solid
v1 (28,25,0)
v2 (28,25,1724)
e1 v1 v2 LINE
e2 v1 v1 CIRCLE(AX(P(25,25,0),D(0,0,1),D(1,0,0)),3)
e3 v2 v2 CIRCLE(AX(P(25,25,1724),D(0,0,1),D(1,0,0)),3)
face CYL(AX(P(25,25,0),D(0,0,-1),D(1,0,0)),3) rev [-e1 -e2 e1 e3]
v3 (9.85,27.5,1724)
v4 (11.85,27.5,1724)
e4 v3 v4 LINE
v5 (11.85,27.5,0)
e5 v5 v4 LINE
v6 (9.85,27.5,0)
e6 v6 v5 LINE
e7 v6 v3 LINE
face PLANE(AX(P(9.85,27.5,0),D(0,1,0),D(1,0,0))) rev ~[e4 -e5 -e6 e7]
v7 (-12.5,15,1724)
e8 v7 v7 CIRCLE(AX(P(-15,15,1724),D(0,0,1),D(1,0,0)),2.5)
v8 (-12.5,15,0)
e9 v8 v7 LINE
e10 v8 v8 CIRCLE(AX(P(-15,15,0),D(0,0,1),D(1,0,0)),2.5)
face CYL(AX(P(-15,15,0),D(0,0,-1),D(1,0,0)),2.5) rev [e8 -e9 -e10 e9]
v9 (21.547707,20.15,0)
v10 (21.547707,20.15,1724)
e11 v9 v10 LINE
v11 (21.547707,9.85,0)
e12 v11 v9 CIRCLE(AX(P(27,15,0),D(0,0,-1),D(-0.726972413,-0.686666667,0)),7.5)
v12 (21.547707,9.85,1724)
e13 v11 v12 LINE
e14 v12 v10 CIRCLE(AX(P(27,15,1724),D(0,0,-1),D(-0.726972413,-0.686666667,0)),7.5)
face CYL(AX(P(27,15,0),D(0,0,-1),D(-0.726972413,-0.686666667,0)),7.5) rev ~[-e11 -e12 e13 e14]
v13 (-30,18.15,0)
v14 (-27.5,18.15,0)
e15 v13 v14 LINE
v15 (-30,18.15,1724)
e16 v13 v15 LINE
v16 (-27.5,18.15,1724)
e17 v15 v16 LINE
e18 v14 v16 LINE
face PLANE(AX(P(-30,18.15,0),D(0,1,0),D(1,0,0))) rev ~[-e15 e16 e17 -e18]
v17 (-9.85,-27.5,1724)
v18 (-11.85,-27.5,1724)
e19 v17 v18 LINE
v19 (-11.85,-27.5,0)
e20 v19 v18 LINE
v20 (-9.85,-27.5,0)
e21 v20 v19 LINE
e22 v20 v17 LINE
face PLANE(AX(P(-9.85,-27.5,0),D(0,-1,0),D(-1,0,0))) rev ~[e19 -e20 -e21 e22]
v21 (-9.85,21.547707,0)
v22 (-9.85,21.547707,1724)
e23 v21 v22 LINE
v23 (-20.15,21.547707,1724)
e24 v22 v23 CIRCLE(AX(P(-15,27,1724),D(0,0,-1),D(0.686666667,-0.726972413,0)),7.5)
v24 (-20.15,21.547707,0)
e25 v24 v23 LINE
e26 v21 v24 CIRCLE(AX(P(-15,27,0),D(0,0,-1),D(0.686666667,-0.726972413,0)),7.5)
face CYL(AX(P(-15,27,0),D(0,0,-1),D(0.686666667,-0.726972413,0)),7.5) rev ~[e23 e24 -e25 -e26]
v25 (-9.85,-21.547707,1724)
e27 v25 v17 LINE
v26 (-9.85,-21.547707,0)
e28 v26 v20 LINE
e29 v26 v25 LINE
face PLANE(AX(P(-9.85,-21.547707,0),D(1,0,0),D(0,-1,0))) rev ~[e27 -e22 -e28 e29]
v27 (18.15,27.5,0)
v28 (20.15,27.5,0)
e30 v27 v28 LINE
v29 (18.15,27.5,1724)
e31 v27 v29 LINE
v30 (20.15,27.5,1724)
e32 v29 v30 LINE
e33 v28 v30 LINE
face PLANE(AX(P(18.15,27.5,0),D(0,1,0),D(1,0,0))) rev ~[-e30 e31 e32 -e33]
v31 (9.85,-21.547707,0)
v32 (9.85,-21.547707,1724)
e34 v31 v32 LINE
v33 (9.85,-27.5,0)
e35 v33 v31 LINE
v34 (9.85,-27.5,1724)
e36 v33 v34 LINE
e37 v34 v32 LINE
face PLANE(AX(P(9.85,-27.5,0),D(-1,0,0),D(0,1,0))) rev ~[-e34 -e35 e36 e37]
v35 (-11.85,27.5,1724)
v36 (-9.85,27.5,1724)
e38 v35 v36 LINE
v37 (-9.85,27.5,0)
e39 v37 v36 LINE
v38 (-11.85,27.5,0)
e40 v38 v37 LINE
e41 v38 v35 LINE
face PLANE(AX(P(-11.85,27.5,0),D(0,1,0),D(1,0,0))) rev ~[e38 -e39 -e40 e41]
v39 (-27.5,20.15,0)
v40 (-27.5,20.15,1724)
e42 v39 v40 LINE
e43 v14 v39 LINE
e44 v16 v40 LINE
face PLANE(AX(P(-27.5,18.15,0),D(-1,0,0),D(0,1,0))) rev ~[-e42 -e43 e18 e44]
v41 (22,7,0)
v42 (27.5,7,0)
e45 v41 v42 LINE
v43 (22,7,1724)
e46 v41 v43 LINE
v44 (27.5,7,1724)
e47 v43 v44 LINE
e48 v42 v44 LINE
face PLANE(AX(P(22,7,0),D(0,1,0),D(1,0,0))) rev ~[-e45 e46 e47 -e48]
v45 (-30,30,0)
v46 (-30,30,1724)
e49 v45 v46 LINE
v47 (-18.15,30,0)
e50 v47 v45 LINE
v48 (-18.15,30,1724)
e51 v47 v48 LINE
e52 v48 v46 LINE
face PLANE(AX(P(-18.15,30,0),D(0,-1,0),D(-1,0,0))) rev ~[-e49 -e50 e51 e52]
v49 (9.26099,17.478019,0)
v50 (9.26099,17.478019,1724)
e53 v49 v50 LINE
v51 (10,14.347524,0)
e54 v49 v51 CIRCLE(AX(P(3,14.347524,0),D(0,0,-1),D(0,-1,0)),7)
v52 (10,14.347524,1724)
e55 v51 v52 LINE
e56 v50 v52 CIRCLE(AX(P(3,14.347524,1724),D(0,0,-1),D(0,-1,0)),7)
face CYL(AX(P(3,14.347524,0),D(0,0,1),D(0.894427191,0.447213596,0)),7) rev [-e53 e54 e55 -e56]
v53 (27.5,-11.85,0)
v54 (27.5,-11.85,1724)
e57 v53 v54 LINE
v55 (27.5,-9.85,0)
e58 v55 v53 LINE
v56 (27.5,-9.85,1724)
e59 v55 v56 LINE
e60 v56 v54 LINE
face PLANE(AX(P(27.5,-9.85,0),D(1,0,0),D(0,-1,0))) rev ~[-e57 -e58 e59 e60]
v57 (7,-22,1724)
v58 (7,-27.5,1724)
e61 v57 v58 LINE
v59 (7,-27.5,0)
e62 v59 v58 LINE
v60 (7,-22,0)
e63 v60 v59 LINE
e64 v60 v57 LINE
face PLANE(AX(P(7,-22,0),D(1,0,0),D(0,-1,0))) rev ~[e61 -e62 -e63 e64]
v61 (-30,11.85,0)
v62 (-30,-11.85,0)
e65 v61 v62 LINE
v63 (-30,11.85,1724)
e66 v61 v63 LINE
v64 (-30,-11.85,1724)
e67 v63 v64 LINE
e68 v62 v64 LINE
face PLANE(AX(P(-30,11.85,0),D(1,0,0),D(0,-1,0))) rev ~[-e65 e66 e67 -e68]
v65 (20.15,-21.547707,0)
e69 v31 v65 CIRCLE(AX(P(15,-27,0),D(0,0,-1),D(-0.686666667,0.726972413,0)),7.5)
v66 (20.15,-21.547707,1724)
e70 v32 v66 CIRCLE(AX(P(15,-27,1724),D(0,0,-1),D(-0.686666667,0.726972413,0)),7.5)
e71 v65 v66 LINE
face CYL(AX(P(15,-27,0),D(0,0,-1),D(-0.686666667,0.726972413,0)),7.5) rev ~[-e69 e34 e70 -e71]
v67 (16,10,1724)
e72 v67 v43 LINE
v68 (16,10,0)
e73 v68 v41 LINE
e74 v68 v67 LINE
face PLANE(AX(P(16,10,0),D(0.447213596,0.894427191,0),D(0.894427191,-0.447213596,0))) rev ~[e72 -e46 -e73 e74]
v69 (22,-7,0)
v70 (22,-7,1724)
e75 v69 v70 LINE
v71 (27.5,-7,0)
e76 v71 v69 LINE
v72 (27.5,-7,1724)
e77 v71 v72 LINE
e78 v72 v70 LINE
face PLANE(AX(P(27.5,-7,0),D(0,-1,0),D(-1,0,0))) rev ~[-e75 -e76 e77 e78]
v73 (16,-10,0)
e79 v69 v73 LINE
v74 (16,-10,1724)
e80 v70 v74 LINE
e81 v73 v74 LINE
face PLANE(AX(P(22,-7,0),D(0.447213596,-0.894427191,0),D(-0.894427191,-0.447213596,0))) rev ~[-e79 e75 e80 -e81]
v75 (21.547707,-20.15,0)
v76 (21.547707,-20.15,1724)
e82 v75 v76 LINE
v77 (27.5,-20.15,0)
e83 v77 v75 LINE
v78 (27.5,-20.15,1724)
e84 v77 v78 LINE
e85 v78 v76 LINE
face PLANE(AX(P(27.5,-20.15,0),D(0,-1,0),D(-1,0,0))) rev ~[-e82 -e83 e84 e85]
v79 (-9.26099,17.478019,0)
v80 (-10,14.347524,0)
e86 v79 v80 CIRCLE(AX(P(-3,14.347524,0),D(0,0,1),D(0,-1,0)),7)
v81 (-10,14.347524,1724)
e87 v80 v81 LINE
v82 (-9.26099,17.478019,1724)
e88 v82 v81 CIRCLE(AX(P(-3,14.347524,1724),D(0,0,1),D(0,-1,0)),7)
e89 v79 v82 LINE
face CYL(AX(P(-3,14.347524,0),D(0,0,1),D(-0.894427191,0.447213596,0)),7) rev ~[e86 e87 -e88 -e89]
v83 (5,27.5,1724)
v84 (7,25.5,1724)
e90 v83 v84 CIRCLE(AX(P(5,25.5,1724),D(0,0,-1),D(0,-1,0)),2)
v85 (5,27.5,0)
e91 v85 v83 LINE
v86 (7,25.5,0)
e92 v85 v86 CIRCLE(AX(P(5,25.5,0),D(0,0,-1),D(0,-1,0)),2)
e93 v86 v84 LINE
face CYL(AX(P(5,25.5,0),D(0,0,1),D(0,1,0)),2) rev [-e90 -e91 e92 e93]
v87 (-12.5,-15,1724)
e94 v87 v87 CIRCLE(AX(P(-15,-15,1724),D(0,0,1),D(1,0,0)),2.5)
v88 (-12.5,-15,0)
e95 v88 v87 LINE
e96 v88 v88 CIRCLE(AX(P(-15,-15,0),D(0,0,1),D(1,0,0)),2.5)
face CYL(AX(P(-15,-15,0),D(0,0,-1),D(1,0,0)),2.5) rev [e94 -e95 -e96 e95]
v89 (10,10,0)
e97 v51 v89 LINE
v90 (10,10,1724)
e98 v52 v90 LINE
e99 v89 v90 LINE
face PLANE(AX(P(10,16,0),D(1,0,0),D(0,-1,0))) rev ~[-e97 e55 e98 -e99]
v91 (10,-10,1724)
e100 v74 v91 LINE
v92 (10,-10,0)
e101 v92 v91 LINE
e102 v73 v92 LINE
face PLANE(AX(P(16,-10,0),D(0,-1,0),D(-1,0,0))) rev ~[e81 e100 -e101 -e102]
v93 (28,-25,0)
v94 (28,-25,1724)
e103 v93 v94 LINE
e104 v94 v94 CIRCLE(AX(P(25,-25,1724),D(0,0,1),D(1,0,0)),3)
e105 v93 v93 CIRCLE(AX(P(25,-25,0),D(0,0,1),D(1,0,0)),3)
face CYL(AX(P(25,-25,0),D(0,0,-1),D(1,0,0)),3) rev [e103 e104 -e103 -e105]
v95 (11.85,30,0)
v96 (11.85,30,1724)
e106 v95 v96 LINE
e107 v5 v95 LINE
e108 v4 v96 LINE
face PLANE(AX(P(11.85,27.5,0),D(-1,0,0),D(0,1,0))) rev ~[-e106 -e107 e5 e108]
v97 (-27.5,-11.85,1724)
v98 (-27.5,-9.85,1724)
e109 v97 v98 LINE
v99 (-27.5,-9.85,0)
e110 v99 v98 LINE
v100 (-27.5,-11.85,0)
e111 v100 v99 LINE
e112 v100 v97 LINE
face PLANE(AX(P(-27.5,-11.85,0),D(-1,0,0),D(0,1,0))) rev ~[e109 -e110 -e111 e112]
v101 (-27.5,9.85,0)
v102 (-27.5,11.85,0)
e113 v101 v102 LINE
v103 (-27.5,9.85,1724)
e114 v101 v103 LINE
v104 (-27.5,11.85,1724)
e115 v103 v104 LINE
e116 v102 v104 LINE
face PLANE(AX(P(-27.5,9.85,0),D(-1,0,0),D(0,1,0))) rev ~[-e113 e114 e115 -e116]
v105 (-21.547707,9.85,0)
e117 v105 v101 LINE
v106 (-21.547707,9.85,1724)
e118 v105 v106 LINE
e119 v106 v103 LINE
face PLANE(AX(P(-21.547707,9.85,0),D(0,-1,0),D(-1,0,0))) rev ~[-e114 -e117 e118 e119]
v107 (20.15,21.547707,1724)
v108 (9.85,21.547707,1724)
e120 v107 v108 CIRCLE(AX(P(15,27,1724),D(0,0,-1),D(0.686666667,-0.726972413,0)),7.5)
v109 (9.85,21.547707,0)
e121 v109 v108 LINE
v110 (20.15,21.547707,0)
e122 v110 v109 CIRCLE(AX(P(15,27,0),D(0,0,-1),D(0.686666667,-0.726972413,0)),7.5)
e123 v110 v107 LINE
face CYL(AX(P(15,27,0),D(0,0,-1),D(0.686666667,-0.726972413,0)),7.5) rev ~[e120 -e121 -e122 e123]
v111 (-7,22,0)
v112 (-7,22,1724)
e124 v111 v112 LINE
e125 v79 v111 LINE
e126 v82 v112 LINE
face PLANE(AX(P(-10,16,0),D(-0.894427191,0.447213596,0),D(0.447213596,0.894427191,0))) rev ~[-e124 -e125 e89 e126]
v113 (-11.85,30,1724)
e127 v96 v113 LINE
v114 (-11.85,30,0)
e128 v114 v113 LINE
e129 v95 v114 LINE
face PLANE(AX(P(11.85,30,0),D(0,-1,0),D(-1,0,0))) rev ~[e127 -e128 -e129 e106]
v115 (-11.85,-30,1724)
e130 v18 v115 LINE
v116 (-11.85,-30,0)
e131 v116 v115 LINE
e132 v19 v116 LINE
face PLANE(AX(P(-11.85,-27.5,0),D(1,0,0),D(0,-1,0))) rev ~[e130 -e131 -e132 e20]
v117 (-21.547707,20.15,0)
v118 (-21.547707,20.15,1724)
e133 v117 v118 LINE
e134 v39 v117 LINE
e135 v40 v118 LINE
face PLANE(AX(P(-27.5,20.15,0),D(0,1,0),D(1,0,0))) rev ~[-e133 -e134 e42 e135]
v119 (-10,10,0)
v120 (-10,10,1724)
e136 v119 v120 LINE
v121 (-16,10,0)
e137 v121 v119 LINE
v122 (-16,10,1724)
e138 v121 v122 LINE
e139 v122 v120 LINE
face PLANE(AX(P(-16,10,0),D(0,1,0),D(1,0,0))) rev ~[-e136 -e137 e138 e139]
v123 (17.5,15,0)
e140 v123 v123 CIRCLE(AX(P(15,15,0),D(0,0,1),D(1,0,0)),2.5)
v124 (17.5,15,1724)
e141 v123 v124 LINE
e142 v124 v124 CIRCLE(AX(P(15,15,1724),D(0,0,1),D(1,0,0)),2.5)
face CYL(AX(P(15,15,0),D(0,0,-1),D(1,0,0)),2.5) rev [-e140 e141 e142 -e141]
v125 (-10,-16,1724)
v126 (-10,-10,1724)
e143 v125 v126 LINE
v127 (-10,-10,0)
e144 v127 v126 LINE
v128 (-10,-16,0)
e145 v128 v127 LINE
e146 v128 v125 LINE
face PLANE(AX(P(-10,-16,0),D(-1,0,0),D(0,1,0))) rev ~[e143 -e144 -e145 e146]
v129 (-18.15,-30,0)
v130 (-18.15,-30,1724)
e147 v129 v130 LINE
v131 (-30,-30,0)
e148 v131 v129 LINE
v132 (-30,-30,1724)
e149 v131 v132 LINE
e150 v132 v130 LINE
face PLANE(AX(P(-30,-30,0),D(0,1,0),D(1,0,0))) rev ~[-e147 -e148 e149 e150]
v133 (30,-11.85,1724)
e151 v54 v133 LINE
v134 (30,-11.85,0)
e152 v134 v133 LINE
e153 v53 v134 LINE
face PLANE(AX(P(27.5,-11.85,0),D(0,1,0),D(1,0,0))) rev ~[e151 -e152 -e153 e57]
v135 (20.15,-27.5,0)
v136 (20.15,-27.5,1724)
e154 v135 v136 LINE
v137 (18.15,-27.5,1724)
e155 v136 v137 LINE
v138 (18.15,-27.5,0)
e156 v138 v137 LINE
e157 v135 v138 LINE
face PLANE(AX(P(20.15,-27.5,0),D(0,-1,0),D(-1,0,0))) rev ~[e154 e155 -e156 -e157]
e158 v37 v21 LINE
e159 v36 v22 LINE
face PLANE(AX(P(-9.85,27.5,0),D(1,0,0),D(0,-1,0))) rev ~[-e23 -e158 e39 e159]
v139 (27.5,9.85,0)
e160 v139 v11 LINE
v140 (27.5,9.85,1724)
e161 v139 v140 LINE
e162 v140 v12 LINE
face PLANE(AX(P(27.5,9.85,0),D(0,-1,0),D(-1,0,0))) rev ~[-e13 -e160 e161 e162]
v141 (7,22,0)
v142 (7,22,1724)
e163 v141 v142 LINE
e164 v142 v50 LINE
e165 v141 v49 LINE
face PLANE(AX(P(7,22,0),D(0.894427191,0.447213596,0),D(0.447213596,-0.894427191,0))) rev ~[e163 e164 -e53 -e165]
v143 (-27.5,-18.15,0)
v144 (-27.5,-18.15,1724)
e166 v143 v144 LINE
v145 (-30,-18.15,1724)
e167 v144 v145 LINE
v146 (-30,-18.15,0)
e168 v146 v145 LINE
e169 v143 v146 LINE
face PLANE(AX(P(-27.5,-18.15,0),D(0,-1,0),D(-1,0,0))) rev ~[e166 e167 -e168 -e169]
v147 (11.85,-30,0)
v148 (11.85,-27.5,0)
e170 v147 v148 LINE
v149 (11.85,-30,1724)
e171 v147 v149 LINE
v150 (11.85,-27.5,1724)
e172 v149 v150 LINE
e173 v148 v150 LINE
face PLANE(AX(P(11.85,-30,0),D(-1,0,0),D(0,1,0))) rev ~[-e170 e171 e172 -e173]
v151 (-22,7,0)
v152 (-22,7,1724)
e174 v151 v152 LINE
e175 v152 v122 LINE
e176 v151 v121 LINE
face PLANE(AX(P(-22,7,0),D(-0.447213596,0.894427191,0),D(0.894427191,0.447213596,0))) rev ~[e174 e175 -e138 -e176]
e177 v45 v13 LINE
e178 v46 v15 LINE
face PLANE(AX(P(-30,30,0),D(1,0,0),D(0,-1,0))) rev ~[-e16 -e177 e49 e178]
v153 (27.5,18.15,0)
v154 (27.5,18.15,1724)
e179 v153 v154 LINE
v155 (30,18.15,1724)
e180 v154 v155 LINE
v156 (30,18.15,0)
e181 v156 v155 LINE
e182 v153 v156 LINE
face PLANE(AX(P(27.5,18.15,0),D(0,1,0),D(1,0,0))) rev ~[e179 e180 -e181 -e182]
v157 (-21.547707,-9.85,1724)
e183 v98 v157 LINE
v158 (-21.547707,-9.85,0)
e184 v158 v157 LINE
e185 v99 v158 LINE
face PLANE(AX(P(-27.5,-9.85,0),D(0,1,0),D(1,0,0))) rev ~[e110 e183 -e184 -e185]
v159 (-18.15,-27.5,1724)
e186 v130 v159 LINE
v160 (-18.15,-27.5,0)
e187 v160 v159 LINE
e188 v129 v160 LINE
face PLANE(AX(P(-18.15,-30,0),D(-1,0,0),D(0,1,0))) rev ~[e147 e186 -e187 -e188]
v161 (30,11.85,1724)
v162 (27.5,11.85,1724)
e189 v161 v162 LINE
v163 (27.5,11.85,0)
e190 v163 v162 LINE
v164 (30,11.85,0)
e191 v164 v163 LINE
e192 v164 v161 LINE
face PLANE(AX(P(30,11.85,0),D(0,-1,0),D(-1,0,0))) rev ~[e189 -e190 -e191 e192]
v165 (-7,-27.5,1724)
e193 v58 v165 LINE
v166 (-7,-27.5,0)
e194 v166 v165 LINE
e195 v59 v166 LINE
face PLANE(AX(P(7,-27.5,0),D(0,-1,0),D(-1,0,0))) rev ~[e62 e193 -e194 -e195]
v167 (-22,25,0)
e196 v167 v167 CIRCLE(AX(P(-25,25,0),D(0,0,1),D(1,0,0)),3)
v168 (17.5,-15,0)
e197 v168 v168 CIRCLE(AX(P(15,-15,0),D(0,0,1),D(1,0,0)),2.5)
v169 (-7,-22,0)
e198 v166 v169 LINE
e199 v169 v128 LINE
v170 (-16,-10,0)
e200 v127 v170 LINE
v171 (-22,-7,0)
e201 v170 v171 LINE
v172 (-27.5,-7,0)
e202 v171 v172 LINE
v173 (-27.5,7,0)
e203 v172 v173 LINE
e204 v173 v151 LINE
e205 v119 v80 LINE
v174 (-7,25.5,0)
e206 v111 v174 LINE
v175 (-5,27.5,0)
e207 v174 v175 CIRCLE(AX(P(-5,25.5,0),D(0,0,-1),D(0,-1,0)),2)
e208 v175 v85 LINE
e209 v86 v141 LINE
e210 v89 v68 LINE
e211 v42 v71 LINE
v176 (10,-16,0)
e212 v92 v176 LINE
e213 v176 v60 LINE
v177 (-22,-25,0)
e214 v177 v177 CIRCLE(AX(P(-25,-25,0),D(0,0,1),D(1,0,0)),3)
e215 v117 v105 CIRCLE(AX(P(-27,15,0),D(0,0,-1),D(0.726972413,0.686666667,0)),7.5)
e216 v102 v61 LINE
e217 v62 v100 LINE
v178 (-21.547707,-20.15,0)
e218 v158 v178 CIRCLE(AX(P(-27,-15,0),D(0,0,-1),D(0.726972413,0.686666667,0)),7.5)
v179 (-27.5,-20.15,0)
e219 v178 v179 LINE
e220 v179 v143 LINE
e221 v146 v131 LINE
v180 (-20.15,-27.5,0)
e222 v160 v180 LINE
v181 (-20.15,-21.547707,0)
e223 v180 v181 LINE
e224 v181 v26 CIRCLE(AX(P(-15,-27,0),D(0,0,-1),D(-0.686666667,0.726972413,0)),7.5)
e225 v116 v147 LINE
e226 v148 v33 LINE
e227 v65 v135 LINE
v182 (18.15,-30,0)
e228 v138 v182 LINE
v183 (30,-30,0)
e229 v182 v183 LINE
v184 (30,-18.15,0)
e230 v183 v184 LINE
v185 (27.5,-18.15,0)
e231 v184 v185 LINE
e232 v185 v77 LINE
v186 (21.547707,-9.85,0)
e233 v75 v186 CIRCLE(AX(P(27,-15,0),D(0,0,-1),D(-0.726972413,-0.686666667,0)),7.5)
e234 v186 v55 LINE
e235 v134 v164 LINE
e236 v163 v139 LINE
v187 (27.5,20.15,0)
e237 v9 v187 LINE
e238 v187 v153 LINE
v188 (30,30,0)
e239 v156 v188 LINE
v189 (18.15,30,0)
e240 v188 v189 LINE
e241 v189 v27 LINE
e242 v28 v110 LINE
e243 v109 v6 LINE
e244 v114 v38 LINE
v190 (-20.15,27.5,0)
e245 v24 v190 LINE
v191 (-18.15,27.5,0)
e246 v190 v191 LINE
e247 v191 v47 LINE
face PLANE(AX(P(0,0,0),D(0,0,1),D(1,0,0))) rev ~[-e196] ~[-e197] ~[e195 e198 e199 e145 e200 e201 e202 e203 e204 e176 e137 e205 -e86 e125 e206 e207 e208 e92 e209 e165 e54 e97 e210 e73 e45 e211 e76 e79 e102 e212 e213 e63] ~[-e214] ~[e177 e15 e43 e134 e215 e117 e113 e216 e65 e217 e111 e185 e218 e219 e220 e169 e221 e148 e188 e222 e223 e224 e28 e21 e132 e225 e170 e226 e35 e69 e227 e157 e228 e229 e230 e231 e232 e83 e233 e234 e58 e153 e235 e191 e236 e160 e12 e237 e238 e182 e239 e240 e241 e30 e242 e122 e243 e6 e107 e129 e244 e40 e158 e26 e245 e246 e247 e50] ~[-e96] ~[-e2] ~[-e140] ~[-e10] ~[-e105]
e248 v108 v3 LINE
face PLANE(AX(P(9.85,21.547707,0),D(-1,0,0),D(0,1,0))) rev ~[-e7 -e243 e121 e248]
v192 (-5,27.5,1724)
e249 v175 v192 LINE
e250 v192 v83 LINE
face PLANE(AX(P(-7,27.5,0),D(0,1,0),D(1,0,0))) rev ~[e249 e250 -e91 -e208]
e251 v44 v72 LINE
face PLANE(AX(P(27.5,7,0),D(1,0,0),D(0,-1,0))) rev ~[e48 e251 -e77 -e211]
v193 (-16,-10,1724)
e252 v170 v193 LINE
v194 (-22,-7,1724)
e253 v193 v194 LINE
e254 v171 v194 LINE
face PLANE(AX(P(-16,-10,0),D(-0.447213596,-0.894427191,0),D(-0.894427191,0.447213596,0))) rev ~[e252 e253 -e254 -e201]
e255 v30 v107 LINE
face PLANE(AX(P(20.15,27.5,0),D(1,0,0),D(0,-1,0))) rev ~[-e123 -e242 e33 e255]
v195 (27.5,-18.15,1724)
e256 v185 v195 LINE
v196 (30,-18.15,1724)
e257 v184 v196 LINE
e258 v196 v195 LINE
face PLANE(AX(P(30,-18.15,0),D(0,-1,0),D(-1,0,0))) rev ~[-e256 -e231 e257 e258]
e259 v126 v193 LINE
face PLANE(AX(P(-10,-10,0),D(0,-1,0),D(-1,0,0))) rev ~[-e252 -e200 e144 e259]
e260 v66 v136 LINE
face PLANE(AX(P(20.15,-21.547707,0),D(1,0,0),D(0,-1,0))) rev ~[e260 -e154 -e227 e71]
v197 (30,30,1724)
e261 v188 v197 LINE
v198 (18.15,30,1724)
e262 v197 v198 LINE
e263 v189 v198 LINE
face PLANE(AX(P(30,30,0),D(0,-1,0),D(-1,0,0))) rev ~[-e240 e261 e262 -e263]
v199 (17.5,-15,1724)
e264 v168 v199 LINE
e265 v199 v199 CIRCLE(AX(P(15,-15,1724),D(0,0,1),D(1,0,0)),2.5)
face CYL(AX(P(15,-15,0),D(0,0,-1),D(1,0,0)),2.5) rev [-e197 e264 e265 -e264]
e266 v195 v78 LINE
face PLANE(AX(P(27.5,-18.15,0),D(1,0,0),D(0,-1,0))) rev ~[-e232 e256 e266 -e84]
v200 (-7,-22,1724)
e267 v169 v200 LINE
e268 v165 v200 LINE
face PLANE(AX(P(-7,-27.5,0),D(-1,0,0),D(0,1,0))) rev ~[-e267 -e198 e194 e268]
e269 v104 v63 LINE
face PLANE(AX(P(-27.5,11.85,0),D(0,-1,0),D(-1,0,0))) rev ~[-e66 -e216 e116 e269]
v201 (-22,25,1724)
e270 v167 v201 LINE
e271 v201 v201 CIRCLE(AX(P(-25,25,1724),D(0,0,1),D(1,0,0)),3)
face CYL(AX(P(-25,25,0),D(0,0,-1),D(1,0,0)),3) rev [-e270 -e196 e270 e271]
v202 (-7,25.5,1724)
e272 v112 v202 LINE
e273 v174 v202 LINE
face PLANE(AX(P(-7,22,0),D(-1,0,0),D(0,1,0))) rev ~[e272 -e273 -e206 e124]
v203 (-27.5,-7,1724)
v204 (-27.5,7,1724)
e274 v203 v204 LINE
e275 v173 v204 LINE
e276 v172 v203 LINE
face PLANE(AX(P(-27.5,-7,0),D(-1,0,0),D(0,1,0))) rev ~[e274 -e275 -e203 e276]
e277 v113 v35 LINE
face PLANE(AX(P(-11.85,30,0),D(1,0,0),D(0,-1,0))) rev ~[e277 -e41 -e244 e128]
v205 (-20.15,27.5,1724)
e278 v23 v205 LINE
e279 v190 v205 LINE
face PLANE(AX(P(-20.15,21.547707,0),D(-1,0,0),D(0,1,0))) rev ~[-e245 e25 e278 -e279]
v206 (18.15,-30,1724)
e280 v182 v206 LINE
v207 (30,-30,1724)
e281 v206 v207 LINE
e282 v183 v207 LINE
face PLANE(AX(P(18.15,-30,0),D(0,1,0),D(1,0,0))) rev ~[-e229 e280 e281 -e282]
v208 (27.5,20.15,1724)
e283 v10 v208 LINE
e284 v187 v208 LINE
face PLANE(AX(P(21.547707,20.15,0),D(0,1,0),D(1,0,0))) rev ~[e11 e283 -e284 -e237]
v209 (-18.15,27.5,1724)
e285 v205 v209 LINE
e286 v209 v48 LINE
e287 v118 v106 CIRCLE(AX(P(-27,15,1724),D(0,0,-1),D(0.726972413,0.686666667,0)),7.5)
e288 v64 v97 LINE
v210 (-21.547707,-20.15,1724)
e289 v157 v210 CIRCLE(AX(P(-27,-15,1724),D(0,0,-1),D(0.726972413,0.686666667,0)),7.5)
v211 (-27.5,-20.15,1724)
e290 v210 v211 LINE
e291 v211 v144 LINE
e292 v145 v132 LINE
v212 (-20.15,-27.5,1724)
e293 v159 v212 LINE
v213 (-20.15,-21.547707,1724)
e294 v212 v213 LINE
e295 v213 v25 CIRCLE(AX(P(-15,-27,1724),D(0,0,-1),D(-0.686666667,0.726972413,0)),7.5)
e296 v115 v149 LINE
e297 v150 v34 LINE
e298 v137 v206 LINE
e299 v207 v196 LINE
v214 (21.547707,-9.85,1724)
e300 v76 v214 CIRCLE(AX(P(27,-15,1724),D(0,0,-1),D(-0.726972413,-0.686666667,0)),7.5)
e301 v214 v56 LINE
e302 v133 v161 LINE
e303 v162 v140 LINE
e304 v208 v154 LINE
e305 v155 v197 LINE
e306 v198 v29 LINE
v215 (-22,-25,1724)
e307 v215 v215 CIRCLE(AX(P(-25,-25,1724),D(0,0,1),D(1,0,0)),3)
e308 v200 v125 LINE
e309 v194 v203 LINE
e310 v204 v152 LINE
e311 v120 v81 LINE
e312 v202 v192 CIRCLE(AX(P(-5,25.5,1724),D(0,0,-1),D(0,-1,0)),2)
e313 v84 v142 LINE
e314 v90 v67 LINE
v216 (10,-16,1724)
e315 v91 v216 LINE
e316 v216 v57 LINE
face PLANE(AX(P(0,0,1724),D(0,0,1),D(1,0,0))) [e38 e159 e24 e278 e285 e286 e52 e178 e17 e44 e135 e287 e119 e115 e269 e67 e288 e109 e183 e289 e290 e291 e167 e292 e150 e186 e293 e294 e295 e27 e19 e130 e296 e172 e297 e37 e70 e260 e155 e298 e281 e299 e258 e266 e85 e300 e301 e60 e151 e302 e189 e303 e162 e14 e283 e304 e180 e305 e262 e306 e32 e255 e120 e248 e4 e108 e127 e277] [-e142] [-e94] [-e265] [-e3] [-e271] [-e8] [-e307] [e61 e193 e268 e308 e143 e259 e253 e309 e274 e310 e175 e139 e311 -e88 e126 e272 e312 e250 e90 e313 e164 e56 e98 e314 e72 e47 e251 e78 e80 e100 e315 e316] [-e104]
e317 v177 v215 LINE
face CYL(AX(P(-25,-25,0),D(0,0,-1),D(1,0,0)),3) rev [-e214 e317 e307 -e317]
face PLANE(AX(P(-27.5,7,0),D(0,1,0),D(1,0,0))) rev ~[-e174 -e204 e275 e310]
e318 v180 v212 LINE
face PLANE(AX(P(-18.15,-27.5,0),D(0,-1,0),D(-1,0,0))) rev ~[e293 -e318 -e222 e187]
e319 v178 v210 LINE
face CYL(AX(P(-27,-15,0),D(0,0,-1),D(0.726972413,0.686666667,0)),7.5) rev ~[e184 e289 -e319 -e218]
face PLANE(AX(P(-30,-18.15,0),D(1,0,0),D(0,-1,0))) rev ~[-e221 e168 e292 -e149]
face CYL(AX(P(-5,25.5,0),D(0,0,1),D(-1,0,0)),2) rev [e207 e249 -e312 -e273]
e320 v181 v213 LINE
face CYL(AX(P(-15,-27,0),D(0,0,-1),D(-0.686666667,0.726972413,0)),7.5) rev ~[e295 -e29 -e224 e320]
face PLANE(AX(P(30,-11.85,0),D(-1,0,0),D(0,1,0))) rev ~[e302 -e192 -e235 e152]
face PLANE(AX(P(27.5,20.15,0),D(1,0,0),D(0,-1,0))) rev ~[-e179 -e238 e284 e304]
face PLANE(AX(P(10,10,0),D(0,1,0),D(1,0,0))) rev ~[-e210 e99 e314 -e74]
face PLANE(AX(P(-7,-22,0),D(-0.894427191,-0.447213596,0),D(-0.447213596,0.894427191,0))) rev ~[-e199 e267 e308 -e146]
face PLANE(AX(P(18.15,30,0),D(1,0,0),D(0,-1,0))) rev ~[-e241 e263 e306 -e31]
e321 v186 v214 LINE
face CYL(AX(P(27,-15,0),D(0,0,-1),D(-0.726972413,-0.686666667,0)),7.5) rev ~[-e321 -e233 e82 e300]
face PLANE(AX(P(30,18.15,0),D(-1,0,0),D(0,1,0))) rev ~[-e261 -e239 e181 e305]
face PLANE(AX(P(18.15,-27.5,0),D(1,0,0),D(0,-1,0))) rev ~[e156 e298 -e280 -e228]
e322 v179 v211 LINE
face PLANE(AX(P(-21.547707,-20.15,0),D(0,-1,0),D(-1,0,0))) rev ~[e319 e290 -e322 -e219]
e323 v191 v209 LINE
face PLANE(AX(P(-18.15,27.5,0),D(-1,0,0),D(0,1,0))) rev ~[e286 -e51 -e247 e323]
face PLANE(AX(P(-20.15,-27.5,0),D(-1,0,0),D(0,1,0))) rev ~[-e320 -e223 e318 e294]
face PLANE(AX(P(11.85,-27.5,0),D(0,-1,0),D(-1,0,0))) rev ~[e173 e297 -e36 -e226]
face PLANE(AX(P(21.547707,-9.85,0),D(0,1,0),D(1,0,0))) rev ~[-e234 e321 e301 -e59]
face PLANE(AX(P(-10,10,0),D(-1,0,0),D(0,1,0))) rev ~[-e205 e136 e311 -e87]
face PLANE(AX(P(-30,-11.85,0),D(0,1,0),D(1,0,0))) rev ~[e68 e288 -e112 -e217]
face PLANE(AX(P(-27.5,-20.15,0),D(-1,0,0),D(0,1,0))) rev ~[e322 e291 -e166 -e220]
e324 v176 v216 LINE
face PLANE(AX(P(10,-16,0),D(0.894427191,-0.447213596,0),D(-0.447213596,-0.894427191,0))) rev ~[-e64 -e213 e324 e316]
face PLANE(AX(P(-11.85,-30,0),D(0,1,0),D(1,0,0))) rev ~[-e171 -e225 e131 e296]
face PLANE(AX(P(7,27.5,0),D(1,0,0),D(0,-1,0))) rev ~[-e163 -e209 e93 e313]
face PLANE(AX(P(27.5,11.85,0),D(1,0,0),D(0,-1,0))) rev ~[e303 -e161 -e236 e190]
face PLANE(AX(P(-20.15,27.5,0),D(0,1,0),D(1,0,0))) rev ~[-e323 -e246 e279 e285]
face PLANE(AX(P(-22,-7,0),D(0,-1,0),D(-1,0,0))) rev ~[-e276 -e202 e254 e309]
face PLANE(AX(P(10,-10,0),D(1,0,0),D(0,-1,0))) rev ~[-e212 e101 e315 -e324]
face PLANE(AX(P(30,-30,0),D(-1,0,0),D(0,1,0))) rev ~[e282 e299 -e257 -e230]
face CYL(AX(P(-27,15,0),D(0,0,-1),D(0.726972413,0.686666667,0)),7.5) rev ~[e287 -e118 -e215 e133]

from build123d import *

# Parameters (mm, degrees)
F0_R     = 3
F0_R_2   = 2.5
F1_DEPTH = 1724
F2_R     = 2
F3_R     = 7


# Not quite as in the source:
# - a feature names something its author has since deleted; it is built from what else it names


with BuildPart() as f1:
    # F0 (on Top) → F1 (new body)
    with BuildSketch(Plane.XY):
        with BuildLine():
            Line((18.15, -30), (30, -30))
            Line((30, -30), (30, -18.15))
            Line((30, -18.15), (27.5, -18.15))
            Line((27.5, -18.15), (27.5, -20.15))
            Line((27.5, -20.15), (21.5477069044, -20.15))
            ThreePointArc((21.5477069044, -20.15), (19.5, -15), (21.5477069044, -9.85))
            Line((21.5477069044, -9.85), (27.5, -9.85))
            Line((27.5, -9.85), (27.5, -11.85))
            Line((27.5, -11.85), (30, -11.85))
            Line((30, -11.85), (30, 11.85))
            Line((30, 11.85), (27.5, 11.85))
            Line((27.5, 11.85), (27.5, 9.85))
            Line((27.5, 9.85), (21.5477069044, 9.85))
            ThreePointArc((21.5477069044, 9.85), (19.5, 15), (21.5477069044, 20.15))
            Line((21.5477069044, 20.15), (27.5, 20.15))
            Line((27.5, 20.15), (27.5, 18.15))
            Line((27.5, 18.15), (30, 18.15))
            Line((30, 18.15), (30, 30))
            Line((30, 30), (18.15, 30))
            Line((18.15, 30), (18.15, 27.5))
            Line((18.15, 27.5), (20.15, 27.5))
            Line((20.15, 27.5), (20.15, 21.5477069044))
            ThreePointArc((20.15, 21.5477069044), (15, 19.5), (9.85, 21.5477069044))
            Line((9.85, 21.5477069044), (9.85, 27.5))
            Line((9.85, 27.5), (11.85, 27.5))
            Line((11.85, 27.5), (11.85, 30))
            Line((11.85, 30), (-11.85, 30))
            Line((-11.85, 30), (-11.85, 27.5))
            Line((-11.85, 27.5), (-9.85, 27.5))
            Line((-9.85, 27.5), (-9.85, 21.5477069044))
            ThreePointArc((-9.85, 21.5477069044), (-15, 19.5), (-20.15, 21.5477069044))
            Line((-20.15, 21.5477069044), (-20.15, 27.5))
            Line((-20.15, 27.5), (-18.15, 27.5))
            Line((-18.15, 27.5), (-18.15, 30))
            Line((-18.15, 30), (-30, 30))
            Line((-30, 30), (-30, 18.15))
            Line((-30, 18.15), (-27.5, 18.15))
            Line((-27.5, 18.15), (-27.5, 20.15))
            Line((-27.5, 20.15), (-21.5477069044, 20.15))
            ThreePointArc((-21.5477069044, 20.15), (-19.5, 15), (-21.5477069044, 9.85))
            Line((-21.5477069044, 9.85), (-27.5, 9.85))
            Line((-27.5, 9.85), (-27.5, 11.85))
            Line((-27.5, 11.85), (-30, 11.85))
            Line((-30, 11.85), (-30, -11.85))
            Line((-30, -11.85), (-27.5, -11.85))
            Line((-27.5, -11.85), (-27.5, -9.85))
            Line((-27.5, -9.85), (-21.5477069044, -9.85))
            ThreePointArc((-21.5477069044, -9.85), (-19.5, -15), (-21.5477069044, -20.15))
            Line((-21.5477069044, -20.15), (-27.5, -20.15))
            Line((-27.5, -20.15), (-27.5, -18.15))
            Line((-27.5, -18.15), (-30, -18.15))
            Line((-30, -18.15), (-30, -30))
            Line((-30, -30), (-18.15, -30))
            Line((-18.15, -30), (-18.15, -27.5))
            Line((-18.15, -27.5), (-20.15, -27.5))
            Line((-20.15, -27.5), (-20.15, -21.5477069044))
            ThreePointArc((-20.15, -21.5477069044), (-15, -19.5), (-9.85, -21.5477069044))
            Line((-9.85, -21.5477069044), (-9.85, -27.5))
            Line((-9.85, -27.5), (-11.85, -27.5))
            Line((-11.85, -27.5), (-11.85, -30))
            Line((-11.85, -30), (11.85, -30))
            Line((11.85, -30), (11.85, -27.5))
            Line((11.85, -27.5), (9.85, -27.5))
            Line((9.85, -27.5), (9.85, -21.5477069044))
            ThreePointArc((9.85, -21.5477069044), (15, -19.5), (20.15, -21.5477069044))
            Line((20.15, -21.5477069044), (20.15, -27.5))
            Line((20.15, -27.5), (18.15, -27.5))
            Line((18.15, -27.5), (18.15, -30))
        make_face()
        with Locations((-25, -25)):
            Circle(F0_R, mode=Mode.SUBTRACT)
        with Locations((-15, -15)):
            Circle(F0_R_2, mode=Mode.SUBTRACT)
        with Locations((25, -25)):
            Circle(F0_R, mode=Mode.SUBTRACT)
        with Locations((15, -15)):
            Circle(F0_R_2, mode=Mode.SUBTRACT)
        with Locations((-25, 25)):
            Circle(F0_R, mode=Mode.SUBTRACT)
        with Locations((-15, 15)):
            Circle(F0_R_2, mode=Mode.SUBTRACT)
        Polygon((-7, 22), (-7, 27.5), (0, 27.5), (7, 27.5), (7, 22), (10, 16), (10, 10), (16, 10), (22, 7), (27.5, 7), (27.5, 0), (27.5, -7), (22, -7), (16, -10), (10, -10), (10, -16), (7, -22), (7, -27.5), (0, -27.5), (-7, -27.5), (-7, -22), (-10, -16), (-10, -10), (-16, -10), (-22, -7), (-27.5, -7), (-27.5, 0), (-27.5, 7), (-22, 7), (-16, 10), (-10, 10), (-10, 16), align=None, mode=Mode.SUBTRACT)
        with Locations((15, 15)):
            Circle(F0_R_2, mode=Mode.SUBTRACT)
        with Locations((25, 25)):
            Circle(F0_R, mode=Mode.SUBTRACT)
    extrude(amount=F1_DEPTH)

    # F2
    f2_edges = [f1.edges().sort_by_distance(p)[0] for p in [
        (-7, 27.5, 862),
        (7, 27.5, 862),
    ]]
    fillet(f2_edges, radius=F2_R)

    # F3
    f3_edges = [f1.edges().sort_by_distance(p)[0] for p in [
        (-10, 16, 862),
        (10, 16, 862),
    ]]
    fillet(f3_edges, radius=F3_R)


solid = f1.part
